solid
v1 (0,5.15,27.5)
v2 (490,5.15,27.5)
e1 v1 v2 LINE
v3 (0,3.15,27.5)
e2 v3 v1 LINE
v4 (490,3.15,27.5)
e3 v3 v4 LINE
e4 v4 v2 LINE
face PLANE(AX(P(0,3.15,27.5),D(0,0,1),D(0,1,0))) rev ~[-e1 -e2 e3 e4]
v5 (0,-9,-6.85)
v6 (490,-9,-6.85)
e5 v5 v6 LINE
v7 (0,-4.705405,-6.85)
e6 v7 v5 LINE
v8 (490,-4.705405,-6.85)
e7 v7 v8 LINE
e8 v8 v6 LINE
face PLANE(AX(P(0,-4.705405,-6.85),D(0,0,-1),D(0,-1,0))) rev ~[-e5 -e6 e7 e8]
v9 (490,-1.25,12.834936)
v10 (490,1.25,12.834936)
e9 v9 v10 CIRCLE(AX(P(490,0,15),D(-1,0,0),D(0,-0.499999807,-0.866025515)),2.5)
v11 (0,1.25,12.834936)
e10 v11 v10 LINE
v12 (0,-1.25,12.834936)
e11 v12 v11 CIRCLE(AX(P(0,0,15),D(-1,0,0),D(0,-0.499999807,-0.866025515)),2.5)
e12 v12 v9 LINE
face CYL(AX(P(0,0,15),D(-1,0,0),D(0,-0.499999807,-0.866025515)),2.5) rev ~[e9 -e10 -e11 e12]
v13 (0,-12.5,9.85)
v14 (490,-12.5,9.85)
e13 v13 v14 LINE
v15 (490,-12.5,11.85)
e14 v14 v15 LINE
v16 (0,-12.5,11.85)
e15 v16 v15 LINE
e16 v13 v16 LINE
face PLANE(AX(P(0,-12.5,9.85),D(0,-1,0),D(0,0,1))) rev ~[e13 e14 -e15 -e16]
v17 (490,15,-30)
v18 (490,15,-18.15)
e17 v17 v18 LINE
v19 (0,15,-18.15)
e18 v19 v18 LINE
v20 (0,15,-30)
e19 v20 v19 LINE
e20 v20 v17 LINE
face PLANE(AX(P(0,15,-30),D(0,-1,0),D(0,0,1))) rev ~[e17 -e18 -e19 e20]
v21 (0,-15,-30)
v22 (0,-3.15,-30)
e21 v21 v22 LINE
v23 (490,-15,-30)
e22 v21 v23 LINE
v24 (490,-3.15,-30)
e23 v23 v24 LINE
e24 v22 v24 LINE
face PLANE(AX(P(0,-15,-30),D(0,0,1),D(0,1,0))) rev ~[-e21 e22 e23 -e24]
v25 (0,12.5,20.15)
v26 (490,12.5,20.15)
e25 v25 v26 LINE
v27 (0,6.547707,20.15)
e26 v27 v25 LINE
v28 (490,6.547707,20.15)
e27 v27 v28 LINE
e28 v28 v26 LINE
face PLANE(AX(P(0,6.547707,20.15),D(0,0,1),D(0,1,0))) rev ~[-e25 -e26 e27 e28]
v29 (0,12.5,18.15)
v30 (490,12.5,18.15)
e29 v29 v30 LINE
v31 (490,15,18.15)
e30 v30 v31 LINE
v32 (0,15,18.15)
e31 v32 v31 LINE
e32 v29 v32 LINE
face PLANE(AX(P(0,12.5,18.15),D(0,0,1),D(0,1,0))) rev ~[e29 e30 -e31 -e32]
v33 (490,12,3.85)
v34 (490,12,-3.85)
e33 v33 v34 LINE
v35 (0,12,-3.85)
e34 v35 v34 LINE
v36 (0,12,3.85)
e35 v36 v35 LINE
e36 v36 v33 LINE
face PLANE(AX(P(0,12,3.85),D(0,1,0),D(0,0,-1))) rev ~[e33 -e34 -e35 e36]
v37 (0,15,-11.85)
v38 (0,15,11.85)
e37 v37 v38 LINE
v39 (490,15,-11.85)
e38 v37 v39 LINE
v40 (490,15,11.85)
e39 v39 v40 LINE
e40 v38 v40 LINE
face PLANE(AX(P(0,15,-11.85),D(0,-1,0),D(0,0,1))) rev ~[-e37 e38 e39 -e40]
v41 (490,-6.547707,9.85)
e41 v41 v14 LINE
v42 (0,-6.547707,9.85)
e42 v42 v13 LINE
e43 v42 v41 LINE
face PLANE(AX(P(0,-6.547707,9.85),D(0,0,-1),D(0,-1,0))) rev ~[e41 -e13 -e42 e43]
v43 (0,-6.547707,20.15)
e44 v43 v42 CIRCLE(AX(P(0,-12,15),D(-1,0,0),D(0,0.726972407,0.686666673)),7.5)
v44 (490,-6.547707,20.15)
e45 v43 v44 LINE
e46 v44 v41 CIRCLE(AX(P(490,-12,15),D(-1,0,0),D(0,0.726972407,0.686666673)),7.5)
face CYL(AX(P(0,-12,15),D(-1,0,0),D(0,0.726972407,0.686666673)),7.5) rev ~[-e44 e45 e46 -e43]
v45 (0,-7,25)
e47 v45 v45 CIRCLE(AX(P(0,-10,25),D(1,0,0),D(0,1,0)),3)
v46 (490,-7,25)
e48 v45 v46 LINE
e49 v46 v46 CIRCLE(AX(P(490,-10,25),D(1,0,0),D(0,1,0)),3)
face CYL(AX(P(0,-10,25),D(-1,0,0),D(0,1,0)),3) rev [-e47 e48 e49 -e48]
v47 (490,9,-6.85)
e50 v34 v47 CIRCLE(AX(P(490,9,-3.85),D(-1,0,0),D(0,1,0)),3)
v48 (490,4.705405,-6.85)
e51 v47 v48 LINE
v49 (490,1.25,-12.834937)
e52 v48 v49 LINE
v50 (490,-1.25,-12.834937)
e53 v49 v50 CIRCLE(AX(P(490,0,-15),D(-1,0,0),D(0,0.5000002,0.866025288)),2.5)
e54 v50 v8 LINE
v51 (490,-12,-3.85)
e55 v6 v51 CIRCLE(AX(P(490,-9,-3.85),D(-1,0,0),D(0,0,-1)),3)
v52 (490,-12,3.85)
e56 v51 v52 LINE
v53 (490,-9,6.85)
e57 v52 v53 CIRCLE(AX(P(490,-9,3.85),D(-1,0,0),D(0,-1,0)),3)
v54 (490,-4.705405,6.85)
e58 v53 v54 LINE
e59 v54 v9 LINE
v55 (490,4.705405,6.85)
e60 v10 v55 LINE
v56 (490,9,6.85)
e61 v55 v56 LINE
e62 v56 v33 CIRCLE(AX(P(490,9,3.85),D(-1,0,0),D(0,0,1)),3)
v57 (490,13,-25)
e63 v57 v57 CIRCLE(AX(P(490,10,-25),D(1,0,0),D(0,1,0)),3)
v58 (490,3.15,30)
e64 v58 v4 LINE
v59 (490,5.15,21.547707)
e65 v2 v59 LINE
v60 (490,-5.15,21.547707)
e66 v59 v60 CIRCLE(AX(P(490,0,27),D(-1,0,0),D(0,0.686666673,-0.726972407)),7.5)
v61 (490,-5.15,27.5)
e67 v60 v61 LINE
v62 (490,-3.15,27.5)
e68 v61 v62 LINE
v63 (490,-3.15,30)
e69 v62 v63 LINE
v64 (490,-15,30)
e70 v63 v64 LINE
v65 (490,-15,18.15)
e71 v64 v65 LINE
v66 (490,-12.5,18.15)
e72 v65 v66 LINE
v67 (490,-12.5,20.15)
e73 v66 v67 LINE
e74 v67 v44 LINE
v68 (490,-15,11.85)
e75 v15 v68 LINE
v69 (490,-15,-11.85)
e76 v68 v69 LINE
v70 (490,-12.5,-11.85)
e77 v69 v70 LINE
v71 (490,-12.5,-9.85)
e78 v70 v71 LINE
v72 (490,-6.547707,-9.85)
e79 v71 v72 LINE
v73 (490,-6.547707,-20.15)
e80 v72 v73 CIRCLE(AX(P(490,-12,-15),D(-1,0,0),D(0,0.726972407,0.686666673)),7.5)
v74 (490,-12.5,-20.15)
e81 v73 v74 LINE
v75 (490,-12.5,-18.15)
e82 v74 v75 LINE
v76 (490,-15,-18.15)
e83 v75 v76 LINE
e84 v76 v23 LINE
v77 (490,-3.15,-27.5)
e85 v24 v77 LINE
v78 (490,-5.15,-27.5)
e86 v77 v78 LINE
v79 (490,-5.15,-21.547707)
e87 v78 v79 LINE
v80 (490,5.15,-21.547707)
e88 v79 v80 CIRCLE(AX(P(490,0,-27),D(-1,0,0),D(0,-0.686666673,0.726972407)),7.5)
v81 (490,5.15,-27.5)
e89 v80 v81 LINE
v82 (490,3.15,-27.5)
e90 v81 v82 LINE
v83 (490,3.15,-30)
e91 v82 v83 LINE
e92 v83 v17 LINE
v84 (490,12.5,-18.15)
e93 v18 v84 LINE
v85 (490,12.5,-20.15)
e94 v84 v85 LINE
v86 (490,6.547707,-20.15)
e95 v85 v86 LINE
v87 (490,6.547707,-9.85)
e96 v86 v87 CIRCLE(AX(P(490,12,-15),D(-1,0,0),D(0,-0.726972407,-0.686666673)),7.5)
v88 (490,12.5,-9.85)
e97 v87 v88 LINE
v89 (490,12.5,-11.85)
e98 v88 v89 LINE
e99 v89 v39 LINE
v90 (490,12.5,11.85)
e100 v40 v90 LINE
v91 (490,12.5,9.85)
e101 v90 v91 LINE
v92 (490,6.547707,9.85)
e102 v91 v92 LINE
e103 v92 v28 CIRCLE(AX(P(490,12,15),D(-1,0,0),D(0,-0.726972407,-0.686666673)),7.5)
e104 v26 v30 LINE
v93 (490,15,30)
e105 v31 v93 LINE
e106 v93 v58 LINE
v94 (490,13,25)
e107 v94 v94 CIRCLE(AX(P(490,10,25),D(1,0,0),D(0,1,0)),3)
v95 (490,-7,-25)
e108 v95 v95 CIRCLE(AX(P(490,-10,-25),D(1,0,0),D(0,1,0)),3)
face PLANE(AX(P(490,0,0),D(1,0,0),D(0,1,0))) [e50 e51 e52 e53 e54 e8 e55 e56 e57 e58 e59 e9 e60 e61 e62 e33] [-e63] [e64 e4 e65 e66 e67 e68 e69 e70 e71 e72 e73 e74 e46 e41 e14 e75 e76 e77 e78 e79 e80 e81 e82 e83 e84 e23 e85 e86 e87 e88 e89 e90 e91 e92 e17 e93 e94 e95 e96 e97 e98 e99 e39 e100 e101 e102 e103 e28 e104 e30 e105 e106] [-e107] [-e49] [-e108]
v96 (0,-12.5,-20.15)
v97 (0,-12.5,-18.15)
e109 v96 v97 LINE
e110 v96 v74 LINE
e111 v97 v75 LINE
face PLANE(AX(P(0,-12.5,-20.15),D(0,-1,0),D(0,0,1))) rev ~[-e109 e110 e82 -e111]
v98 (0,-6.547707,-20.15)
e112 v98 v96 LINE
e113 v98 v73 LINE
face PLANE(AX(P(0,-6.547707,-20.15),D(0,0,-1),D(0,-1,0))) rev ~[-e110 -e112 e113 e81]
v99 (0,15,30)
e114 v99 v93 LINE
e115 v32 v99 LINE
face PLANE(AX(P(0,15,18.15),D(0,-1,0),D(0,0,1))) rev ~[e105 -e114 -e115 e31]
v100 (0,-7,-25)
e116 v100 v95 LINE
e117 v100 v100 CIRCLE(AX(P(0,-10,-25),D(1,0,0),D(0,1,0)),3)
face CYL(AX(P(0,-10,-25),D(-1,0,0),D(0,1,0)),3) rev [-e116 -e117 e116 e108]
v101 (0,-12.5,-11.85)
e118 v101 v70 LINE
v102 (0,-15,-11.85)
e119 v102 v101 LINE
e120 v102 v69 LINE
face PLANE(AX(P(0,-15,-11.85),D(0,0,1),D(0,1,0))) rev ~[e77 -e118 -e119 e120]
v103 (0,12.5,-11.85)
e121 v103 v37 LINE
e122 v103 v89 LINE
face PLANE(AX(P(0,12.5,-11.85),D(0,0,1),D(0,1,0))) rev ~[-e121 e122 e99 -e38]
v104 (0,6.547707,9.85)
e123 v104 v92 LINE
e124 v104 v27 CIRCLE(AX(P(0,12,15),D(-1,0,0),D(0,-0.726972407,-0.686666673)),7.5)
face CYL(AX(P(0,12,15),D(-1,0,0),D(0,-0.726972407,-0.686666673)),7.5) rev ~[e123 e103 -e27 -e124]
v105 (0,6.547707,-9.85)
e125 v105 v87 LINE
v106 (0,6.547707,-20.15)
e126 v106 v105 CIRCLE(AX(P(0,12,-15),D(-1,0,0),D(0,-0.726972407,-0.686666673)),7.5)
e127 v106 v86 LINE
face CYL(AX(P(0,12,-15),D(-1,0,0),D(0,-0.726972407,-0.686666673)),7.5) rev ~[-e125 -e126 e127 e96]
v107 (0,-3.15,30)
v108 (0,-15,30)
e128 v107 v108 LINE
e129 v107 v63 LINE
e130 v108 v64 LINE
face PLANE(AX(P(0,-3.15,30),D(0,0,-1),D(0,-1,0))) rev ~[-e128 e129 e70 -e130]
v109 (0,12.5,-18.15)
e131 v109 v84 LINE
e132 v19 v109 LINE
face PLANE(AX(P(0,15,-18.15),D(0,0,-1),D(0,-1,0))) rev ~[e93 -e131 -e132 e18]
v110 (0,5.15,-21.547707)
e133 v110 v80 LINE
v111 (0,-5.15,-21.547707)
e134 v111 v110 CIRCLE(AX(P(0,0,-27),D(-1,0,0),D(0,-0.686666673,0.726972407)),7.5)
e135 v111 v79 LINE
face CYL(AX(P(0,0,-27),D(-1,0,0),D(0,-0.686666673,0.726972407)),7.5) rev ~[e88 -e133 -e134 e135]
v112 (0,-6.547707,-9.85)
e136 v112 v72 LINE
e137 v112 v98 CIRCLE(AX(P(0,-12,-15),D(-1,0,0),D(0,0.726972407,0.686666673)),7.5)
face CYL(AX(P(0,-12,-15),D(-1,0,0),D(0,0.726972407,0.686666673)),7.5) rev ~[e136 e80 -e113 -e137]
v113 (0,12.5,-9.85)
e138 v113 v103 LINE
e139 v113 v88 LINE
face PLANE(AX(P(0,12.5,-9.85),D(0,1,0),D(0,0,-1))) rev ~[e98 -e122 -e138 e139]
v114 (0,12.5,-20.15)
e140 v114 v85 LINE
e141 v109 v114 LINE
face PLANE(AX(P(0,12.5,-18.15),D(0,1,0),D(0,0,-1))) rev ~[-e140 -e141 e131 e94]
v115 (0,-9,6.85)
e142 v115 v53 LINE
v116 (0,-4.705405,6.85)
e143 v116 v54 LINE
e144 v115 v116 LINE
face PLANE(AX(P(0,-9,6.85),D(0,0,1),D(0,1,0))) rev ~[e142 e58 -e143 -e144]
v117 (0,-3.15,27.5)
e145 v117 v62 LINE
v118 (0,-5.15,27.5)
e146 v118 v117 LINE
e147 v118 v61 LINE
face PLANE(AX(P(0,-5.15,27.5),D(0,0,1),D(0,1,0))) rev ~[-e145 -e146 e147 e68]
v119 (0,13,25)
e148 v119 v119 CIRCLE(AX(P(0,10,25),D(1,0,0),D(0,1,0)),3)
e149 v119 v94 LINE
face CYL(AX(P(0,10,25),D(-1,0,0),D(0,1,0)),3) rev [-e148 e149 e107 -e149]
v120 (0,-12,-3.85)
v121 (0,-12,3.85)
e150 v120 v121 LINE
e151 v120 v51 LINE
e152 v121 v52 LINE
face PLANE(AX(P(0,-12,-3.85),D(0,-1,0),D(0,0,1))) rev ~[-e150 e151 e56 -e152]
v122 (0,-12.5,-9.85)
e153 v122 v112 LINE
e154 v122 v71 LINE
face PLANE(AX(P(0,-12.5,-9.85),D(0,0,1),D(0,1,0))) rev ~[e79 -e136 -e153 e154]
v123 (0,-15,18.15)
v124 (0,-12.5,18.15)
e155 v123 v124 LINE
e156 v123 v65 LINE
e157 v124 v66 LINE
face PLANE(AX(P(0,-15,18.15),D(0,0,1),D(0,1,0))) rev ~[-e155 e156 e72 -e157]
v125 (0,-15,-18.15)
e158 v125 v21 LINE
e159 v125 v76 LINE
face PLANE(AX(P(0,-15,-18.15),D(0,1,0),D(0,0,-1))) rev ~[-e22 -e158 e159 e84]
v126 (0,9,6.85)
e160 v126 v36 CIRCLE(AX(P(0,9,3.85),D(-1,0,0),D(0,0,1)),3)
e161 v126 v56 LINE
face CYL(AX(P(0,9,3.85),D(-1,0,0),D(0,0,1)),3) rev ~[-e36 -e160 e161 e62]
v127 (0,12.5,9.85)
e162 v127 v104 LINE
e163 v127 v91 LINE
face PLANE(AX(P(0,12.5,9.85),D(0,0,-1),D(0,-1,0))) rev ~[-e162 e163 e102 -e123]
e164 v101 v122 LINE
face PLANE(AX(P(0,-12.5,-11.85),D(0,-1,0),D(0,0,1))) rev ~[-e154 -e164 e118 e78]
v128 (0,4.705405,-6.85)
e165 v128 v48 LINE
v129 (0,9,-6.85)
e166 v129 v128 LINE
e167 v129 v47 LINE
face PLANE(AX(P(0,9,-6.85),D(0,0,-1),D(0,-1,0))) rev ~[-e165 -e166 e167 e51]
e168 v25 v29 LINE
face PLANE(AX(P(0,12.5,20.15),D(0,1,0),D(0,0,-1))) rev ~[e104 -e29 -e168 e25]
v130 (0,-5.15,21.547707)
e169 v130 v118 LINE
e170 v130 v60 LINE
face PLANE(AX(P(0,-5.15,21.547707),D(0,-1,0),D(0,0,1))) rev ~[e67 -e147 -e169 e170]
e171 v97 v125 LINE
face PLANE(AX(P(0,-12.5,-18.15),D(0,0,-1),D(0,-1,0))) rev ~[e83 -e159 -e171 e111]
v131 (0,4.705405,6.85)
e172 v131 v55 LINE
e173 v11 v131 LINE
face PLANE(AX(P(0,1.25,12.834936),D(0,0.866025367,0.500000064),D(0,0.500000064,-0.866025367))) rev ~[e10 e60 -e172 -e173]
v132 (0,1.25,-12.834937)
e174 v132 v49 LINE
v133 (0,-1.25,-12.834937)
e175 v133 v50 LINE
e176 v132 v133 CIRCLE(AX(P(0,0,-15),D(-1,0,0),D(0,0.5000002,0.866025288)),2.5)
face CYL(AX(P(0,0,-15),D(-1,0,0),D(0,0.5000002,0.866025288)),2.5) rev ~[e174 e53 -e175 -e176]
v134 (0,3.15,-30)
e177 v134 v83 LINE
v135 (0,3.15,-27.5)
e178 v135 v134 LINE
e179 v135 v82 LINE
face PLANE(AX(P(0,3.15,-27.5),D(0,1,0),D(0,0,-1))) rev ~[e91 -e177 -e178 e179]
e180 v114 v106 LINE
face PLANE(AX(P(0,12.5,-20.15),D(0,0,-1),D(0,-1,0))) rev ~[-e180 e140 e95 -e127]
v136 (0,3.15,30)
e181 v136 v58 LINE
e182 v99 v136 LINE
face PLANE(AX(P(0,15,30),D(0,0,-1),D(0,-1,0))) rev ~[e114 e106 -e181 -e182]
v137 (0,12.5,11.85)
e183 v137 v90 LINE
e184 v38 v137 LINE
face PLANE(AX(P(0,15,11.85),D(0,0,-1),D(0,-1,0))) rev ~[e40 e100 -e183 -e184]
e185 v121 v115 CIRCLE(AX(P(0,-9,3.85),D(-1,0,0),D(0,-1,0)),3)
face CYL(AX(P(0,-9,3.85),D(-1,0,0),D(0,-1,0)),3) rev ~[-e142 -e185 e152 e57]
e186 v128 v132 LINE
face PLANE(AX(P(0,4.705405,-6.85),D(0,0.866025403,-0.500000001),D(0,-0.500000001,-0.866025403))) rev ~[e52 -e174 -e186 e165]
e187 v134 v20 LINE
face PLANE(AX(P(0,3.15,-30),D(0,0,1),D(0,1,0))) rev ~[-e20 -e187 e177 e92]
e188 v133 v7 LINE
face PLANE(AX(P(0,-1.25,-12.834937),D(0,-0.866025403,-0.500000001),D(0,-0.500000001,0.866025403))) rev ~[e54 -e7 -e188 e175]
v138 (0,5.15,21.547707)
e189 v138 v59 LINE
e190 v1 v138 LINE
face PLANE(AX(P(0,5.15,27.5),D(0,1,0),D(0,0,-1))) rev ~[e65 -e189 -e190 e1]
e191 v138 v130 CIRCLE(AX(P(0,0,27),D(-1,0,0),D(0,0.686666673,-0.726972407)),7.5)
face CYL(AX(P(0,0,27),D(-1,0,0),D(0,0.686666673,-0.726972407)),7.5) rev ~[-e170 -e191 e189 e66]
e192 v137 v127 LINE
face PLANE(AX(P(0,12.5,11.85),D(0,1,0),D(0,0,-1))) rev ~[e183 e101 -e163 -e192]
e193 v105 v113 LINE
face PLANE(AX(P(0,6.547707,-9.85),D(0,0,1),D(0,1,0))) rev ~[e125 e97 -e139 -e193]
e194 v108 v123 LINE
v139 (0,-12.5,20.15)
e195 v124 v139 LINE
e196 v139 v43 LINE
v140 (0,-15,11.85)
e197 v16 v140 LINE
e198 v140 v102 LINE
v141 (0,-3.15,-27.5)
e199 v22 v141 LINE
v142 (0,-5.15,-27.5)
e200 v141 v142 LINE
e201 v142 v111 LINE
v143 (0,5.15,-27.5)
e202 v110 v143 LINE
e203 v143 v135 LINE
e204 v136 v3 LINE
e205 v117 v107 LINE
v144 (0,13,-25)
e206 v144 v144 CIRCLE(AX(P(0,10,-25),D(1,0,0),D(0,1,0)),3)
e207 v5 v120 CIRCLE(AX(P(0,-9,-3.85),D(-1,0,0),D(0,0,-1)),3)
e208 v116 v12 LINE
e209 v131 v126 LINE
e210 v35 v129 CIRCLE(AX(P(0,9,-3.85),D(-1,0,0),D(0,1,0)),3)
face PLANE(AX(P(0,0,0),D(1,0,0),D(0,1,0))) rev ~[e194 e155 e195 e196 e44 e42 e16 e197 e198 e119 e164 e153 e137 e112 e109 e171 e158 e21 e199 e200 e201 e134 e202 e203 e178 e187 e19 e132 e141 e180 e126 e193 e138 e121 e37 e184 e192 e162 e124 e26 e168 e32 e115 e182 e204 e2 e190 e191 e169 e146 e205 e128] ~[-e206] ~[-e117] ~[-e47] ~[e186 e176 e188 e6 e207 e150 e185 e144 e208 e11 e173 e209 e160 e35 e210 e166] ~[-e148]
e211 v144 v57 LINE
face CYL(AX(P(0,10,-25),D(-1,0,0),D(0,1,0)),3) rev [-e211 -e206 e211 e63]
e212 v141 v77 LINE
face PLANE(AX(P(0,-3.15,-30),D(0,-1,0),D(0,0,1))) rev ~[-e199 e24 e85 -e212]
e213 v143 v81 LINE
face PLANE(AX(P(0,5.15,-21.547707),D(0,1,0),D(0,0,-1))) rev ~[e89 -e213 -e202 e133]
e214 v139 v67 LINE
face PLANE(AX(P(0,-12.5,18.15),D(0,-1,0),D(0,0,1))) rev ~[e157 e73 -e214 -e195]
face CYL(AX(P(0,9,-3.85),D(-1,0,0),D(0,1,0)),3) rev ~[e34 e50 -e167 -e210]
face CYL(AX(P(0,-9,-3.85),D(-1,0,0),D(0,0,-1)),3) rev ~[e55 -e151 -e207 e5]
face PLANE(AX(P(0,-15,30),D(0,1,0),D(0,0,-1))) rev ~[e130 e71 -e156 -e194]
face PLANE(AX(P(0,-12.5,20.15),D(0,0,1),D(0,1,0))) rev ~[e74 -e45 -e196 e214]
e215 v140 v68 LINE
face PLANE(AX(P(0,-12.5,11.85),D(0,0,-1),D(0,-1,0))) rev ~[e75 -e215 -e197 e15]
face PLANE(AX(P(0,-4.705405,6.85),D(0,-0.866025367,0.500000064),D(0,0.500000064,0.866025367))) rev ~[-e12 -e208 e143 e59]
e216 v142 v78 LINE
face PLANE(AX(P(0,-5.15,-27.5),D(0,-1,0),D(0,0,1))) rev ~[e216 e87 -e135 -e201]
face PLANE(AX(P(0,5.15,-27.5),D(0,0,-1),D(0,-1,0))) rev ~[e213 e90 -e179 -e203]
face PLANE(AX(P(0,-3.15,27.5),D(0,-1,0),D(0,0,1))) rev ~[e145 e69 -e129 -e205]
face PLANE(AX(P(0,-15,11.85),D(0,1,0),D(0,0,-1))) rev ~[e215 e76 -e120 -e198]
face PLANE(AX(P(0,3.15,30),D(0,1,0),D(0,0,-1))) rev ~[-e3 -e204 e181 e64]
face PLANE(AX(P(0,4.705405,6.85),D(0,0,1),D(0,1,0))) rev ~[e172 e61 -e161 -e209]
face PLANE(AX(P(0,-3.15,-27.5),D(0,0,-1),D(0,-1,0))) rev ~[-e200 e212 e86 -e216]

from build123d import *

# Parameters (mm, degrees)
F0_R     = 3
F1_DEPTH = 490


# Not quite as in the source:
# - ends of sketch curves that miss each other by under 0.0002 mm in the source are joined


with BuildPart() as f1:
    # F0 (on Right) → F1 (new body)
    with BuildSketch(Plane.YZ):
        with BuildLine():
            Line((12.5, -11.85), (15, -11.85))
            Line((15, -11.85), (15, 11.85))
            Line((15, 11.85), (12.5, 11.85))
            Line((12.5, 11.85), (12.5, 9.85))
            Line((12.5, 9.85), (6.547707, 9.85))
            ThreePointArc((6.5477069495, 9.8499999523), (4.5, 15), (6.5477069495, 20.1500000477))
            Line((6.547707, 20.15), (12.5, 20.15))
            Line((12.5, 20.15), (12.5, 18.15))
            Line((12.5, 18.15), (15, 18.15))
            Line((15, 18.15), (15, 30))
            Line((15, 30), (3.15, 30))
            Line((3.15, 30), (3.15, 27.5))
            Line((3.15, 27.5), (5.15, 27.5))
            Line((5.15, 27.5), (5.15, 21.547707))
            ThreePointArc((5.1500000477, 21.5477069495), (0, 19.5), (-5.1500000477, 21.5477069495))
            Line((-5.15, 21.547707), (-5.15, 27.5))
            Line((-5.15, 27.5), (-3.15, 27.5))
            Line((-3.15, 27.5), (-3.15, 30))
            Line((-3.15, 30), (-15, 30))
            Line((-15, 30), (-15, 18.15))
            Line((-15, 18.15), (-12.5, 18.15))
            Line((-12.5, 18.15), (-12.5, 20.15))
            Line((-12.5, 20.15), (-6.547707, 20.15))
            ThreePointArc((-6.5477069495, 20.1500000477), (-4.5, 15), (-6.5477069495, 9.8499999523))
            Line((-6.547707, 9.85), (-12.5, 9.85))
            Line((-12.5, 9.85), (-12.5, 11.85))
            Line((-12.5, 11.85), (-15, 11.85))
            Line((-15, 11.85), (-15, -11.85))
            Line((-15, -11.85), (-12.5, -11.85))
            Line((-12.5, -11.85), (-12.5, -9.85))
            Line((-12.5, -9.85), (-6.547707, -9.85))
            ThreePointArc((-6.5477069495, -9.8499999523), (-4.5, -15), (-6.5477069495, -20.1500000477))
            Line((-6.547707, -20.15), (-12.5, -20.15))
            Line((-12.5, -20.15), (-12.5, -18.15))
            Line((-12.5, -18.15), (-15, -18.15))
            Line((-15, -18.15), (-15, -30))
            Line((-15, -30), (-3.15, -30))
            Line((-3.15, -30), (-3.15, -27.5))
            Line((-3.15, -27.5), (-5.15, -27.5))
            Line((-5.15, -27.5), (-5.15, -21.547707))
            ThreePointArc((-5.1500000477, -21.5477069495), (0, -19.5), (5.1500000477, -21.5477069495))
            Line((5.15, -21.547707), (5.15, -27.5))
            Line((5.15, -27.5), (3.15, -27.5))
            Line((3.15, -27.5), (3.15, -30))
            Line((3.15, -30), (15, -30))
            Line((15, -30), (15, -18.15))
            Line((15, -18.15), (12.5, -18.15))
            Line((12.5, -18.15), (12.5, -20.15))
            Line((12.5, -20.15), (6.547707, -20.15))
            ThreePointArc((6.5477069495, -20.1500000477), (4.5, -15), (6.5477069495, -9.8499999523))
            Line((6.547707, -9.85), (12.5, -9.85))
            Line((12.5, -9.85), (12.5, -11.85))
        make_face()
        with Locations((-10, -25)):
            Circle(F0_R, mode=Mode.SUBTRACT)
        with Locations((10, -25)):
            Circle(F0_R, mode=Mode.SUBTRACT)
        with Locations((-10, 25)):
            Circle(F0_R, mode=Mode.SUBTRACT)
        with BuildLine():
            ThreePointArc((-12, 3.85), (-11.1213203436, 5.9713203436), (-9, 6.85))
            Line((-9, 6.85), (-4.705405, 6.85))
            Line((-4.705405, 6.85), (-1.25, 12.834936))
            ThreePointArc((-1.25, 12.834936), (0, 17.5), (1.2499997876, 12.8349363679))
            Line((1.2499997876, 12.8349363679), (4.705405, 6.85))
            Line((4.705405, 6.85), (9, 6.85))
            ThreePointArc((9, 6.85), (11.1213203436, 5.9713203436), (12, 3.85))
            Line((12, 3.85), (12, -3.85))
            ThreePointArc((12, -3.85), (11.1213203436, -5.9713203436), (9, -6.85))
            Line((9, -6.85), (4.705405, -6.85))
            Line((4.705405, -6.85), (1.25, -12.834937))
            ThreePointArc((1.25, -12.834937), (0, -17.5), (-1.2500002206, -12.8349366179))
            Line((-1.2500002206, -12.8349366179), (-4.705405, -6.85))
            Line((-4.705405, -6.85), (-9, -6.85))
            ThreePointArc((-9, -6.85), (-11.1213203436, -5.9713203436), (-12, -3.85))
            Line((-12, -3.85), (-12, 3.85))
        make_face(mode=Mode.SUBTRACT)
        with Locations((10, 25)):
            Circle(F0_R, mode=Mode.SUBTRACT)
    extrude(amount=F1_DEPTH)


solid = f1.part
